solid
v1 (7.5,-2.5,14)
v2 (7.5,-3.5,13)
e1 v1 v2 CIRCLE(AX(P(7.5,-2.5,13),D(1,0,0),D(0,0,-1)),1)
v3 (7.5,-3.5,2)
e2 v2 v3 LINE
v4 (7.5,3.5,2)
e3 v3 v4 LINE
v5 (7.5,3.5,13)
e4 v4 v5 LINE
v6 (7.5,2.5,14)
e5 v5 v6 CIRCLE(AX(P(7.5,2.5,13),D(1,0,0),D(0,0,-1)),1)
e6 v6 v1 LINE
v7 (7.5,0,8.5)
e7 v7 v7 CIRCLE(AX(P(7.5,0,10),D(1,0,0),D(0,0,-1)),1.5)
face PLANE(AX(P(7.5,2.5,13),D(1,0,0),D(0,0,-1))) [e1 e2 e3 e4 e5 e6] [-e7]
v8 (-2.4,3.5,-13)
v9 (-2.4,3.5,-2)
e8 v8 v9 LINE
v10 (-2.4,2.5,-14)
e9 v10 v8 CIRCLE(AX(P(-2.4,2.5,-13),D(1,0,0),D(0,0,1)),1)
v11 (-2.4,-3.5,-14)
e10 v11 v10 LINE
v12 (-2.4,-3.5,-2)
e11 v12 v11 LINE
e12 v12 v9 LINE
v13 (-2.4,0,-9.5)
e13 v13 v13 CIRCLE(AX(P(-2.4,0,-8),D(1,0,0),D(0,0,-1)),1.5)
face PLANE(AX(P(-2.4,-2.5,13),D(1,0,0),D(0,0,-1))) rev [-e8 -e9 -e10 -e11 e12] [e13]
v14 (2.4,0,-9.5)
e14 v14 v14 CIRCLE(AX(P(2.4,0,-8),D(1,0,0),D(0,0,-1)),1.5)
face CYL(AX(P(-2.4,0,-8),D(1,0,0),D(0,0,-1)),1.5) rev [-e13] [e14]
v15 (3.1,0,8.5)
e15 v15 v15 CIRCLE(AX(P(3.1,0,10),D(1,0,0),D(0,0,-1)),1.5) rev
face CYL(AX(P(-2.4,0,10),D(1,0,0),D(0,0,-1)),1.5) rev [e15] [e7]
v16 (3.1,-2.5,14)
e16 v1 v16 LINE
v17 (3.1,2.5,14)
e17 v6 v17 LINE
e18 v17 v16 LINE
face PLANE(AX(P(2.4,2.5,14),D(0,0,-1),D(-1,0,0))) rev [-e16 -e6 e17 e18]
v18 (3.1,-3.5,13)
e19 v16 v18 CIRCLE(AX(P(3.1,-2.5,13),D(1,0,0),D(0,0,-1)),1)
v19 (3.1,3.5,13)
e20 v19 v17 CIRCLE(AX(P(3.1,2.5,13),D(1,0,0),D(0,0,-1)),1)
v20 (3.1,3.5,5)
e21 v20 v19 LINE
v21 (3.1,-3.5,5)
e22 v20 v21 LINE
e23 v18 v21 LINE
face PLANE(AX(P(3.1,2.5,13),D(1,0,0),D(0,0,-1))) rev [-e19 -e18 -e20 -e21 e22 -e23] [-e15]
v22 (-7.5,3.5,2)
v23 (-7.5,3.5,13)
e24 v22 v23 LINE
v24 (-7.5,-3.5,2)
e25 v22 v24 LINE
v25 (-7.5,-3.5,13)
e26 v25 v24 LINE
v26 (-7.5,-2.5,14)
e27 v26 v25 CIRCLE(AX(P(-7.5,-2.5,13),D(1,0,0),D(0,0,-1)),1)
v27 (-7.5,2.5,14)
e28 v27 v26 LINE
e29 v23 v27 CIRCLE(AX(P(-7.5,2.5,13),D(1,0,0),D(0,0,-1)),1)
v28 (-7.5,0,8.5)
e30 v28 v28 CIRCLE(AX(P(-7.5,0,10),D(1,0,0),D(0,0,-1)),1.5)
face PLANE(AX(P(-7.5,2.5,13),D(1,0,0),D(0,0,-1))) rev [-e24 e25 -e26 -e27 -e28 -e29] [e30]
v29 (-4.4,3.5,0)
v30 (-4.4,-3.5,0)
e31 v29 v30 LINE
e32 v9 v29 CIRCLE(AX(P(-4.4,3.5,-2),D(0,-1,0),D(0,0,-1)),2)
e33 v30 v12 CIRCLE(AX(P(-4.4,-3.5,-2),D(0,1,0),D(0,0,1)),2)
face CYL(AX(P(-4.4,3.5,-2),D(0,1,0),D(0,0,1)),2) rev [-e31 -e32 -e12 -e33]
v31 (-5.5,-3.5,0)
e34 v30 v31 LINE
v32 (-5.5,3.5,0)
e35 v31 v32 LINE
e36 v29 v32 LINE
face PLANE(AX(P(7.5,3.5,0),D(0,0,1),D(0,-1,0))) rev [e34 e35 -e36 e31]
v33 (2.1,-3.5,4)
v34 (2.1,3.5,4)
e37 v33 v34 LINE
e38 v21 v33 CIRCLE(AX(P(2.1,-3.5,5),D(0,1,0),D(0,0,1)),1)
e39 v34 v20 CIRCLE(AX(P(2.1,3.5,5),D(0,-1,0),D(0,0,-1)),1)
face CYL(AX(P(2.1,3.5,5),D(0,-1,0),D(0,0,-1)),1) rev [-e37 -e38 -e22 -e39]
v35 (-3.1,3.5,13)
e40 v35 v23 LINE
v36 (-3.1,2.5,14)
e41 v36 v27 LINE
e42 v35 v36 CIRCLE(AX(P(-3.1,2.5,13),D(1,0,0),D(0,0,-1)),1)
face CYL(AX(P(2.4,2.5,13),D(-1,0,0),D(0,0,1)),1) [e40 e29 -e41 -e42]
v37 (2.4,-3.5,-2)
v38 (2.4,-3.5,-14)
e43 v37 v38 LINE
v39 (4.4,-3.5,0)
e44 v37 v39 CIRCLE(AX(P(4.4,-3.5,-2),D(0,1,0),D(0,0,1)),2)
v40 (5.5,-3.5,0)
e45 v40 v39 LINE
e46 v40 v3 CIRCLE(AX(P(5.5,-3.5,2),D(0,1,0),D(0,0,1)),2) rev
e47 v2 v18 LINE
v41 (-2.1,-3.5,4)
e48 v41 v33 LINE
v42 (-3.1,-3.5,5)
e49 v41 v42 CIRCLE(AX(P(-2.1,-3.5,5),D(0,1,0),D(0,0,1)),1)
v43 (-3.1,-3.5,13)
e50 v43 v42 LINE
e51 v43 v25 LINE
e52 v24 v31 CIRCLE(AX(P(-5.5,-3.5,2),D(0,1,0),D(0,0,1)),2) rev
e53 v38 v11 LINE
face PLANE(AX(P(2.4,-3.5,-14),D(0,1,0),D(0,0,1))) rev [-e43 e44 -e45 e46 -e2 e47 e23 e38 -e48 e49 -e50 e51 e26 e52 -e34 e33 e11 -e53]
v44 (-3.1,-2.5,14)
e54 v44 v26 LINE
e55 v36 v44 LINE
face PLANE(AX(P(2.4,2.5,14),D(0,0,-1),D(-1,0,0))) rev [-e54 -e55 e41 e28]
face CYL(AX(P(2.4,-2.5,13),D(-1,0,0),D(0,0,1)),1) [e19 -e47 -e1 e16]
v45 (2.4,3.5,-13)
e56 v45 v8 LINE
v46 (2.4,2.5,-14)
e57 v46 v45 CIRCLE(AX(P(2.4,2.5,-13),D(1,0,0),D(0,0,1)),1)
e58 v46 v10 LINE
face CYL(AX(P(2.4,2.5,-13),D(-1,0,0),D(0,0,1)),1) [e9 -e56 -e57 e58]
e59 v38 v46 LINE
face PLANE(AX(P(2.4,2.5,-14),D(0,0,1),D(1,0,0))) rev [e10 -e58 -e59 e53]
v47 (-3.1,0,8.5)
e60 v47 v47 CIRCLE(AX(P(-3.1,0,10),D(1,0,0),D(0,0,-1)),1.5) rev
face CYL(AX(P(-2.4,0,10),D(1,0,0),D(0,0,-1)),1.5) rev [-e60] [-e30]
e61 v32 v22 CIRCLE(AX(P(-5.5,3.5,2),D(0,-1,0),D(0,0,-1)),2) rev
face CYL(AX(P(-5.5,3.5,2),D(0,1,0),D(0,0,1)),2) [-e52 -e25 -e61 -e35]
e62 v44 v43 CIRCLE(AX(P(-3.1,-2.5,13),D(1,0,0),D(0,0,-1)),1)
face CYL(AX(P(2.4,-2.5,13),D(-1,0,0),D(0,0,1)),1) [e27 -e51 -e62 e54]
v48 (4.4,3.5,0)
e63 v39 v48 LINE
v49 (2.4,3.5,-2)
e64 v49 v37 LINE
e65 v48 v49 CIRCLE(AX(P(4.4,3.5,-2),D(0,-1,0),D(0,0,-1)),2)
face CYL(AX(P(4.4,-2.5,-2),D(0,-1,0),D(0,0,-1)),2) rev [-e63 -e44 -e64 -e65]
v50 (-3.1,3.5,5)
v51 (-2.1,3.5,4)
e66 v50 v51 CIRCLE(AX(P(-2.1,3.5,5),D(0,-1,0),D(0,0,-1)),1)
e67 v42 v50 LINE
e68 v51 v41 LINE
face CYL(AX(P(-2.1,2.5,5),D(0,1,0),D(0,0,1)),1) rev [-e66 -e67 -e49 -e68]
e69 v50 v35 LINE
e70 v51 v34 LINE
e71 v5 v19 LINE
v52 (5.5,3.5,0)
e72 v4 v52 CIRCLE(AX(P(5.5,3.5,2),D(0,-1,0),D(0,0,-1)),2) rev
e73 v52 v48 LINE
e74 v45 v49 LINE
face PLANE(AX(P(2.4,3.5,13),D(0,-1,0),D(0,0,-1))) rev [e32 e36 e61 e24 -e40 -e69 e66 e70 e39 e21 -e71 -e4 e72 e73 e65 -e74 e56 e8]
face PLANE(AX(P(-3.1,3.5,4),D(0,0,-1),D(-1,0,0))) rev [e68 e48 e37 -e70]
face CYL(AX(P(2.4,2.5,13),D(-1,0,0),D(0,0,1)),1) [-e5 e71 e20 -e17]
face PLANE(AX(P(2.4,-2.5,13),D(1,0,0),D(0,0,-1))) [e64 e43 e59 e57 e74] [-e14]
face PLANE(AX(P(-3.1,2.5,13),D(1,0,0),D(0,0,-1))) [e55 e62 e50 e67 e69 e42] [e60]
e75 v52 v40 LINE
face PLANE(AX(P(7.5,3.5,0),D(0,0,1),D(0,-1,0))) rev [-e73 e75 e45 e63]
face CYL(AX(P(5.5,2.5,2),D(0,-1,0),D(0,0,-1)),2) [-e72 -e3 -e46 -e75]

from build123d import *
from build123d.topology import SkipClean

# Parameters (mm, degrees)
SALIENTE_EXTRUIR1_DEPTH    = 2.4
CORTAR_EXTRUIR1_DEPTH      = 15.629080627
CORTAR_EXTRUIR1_DEPTH_BACK = 15.629080627
CROQUIS2_R                 = 1.5
CROQUIS3_R                 = 1.5
SALIENTE_EXTRUIR2_DEPTH    = 7.5
CORTAR_EXTRUIR2_DEPTH      = 3.1
REDONDEO1_R                = 2
REDONDEO2_R                = 1


with BuildPart() as part:
    # Croquis1 → Saliente-Extruir1 (new, symmetric)
    with BuildSketch(Plane(origin=(0, 0, 0), x_dir=(0, 0, -1), z_dir=(1, 0, 0))):
        with BuildLine():
            Line((-13, 3.5), (13, 3.5))
            ThreePointArc((13, 3.5), (13.707106781, 3.207106781), (14, 2.5))
            Line((14, 2.5), (14, -2.5))
            Line((14, -2.5), (14, -3.5))
            Line((14, -3.5), (13, -3.5))
            Line((13, -3.5), (-13, -3.5))
            ThreePointArc((-13, -3.5), (-13.707106781, -3.207106781), (-14, -2.5))
            Line((-14, -2.5), (-14, 2.5))
            ThreePointArc((-14, 2.5), (-13.707106781, 3.207106781), (-13, 3.5))
        make_face()
    extrude(amount=SALIENTE_EXTRUIR1_DEPTH, both=True)

    # Croquis2 → Cortar-Extruir1 (cut, two sides: drawn at the far end of the back side and taken through both)
    with BuildSketch(Plane(origin=(0, 0, 0), x_dir=(0, 0, -1), z_dir=(1, 0, 0)).offset(-CORTAR_EXTRUIR1_DEPTH_BACK)):
        with Locations((-10, 0)):
            Circle(CROQUIS2_R)
        with Locations((8, 0)):
            Circle(CROQUIS2_R)
    extrude(amount=CORTAR_EXTRUIR1_DEPTH + CORTAR_EXTRUIR1_DEPTH_BACK, mode=Mode.SUBTRACT)

    # Croquis3 → Saliente-Extruir2 (add, symmetric)
    with SkipClean():  # the faces are left unmerged after this step: merging them gives an invalid solid
        with BuildSketch(Plane(origin=(0, 0, 0), x_dir=(0, 0, -1), z_dir=(1, 0, 0))):
            with BuildLine():
                Line((-14, 2.5), (-14, -2.5))
                ThreePointArc((-14, -2.5), (-13.707106781, -3.207106781), (-13, -3.5))
                Line((-13, -3.5), (0, -3.5))
                Line((0, -3.5), (0, 3.5))
                Line((0, 3.5), (-13, 3.5))
                ThreePointArc((-13, 3.5), (-13.707106781, 3.207106781), (-14, 2.5))
            make_face()
            with Locations((-10, 0)):
                Circle(CROQUIS3_R, mode=Mode.SUBTRACT)
        extrude(amount=SALIENTE_EXTRUIR2_DEPTH, both=True)
    add(part.part.scale(1), mode=Mode.REPLACE)  # the faces are merged on a copy

    # Croquis4 → Cortar-Extruir2 (cut, symmetric)
    with BuildSketch(Plane(origin=(0, 0, 0), x_dir=(0, 0, -1), z_dir=(1, 0, 0))):
        with BuildLine():
            Line((-13, 3.5), (-4, 3.5))
            Line((-4, 3.5), (-4, -3.5))
            Line((-4, -3.5), (-13, -3.5))
            ThreePointArc((-13, -3.5), (-13.707106781, -3.207106781), (-14, -2.5))
            Line((-14, -2.5), (-14, 2.5))
            ThreePointArc((-14, 2.5), (-13.707106781, 3.207106781), (-13, 3.5))
        make_face()
    extrude(amount=CORTAR_EXTRUIR2_DEPTH, both=True, mode=Mode.SUBTRACT)

    # Redondeo1
    redondeo1_edges = [part.edges().sort_by_distance(p)[0] for p in [
        (-2.4, 0, 0),
        (2.4, 0, 0),
        (-7.5, 0, 0),
        (7.5, 0, 0),
    ]]
    fillet(redondeo1_edges, radius=REDONDEO1_R)

    # Redondeo2
    redondeo2_edges = [part.edges().sort_by_distance(p)[0] for p in [
        (3.1, 0, 4),
        (-3.1, 0, 4),
    ]]
    fillet(redondeo2_edges, radius=REDONDEO2_R)


solid = part.part
